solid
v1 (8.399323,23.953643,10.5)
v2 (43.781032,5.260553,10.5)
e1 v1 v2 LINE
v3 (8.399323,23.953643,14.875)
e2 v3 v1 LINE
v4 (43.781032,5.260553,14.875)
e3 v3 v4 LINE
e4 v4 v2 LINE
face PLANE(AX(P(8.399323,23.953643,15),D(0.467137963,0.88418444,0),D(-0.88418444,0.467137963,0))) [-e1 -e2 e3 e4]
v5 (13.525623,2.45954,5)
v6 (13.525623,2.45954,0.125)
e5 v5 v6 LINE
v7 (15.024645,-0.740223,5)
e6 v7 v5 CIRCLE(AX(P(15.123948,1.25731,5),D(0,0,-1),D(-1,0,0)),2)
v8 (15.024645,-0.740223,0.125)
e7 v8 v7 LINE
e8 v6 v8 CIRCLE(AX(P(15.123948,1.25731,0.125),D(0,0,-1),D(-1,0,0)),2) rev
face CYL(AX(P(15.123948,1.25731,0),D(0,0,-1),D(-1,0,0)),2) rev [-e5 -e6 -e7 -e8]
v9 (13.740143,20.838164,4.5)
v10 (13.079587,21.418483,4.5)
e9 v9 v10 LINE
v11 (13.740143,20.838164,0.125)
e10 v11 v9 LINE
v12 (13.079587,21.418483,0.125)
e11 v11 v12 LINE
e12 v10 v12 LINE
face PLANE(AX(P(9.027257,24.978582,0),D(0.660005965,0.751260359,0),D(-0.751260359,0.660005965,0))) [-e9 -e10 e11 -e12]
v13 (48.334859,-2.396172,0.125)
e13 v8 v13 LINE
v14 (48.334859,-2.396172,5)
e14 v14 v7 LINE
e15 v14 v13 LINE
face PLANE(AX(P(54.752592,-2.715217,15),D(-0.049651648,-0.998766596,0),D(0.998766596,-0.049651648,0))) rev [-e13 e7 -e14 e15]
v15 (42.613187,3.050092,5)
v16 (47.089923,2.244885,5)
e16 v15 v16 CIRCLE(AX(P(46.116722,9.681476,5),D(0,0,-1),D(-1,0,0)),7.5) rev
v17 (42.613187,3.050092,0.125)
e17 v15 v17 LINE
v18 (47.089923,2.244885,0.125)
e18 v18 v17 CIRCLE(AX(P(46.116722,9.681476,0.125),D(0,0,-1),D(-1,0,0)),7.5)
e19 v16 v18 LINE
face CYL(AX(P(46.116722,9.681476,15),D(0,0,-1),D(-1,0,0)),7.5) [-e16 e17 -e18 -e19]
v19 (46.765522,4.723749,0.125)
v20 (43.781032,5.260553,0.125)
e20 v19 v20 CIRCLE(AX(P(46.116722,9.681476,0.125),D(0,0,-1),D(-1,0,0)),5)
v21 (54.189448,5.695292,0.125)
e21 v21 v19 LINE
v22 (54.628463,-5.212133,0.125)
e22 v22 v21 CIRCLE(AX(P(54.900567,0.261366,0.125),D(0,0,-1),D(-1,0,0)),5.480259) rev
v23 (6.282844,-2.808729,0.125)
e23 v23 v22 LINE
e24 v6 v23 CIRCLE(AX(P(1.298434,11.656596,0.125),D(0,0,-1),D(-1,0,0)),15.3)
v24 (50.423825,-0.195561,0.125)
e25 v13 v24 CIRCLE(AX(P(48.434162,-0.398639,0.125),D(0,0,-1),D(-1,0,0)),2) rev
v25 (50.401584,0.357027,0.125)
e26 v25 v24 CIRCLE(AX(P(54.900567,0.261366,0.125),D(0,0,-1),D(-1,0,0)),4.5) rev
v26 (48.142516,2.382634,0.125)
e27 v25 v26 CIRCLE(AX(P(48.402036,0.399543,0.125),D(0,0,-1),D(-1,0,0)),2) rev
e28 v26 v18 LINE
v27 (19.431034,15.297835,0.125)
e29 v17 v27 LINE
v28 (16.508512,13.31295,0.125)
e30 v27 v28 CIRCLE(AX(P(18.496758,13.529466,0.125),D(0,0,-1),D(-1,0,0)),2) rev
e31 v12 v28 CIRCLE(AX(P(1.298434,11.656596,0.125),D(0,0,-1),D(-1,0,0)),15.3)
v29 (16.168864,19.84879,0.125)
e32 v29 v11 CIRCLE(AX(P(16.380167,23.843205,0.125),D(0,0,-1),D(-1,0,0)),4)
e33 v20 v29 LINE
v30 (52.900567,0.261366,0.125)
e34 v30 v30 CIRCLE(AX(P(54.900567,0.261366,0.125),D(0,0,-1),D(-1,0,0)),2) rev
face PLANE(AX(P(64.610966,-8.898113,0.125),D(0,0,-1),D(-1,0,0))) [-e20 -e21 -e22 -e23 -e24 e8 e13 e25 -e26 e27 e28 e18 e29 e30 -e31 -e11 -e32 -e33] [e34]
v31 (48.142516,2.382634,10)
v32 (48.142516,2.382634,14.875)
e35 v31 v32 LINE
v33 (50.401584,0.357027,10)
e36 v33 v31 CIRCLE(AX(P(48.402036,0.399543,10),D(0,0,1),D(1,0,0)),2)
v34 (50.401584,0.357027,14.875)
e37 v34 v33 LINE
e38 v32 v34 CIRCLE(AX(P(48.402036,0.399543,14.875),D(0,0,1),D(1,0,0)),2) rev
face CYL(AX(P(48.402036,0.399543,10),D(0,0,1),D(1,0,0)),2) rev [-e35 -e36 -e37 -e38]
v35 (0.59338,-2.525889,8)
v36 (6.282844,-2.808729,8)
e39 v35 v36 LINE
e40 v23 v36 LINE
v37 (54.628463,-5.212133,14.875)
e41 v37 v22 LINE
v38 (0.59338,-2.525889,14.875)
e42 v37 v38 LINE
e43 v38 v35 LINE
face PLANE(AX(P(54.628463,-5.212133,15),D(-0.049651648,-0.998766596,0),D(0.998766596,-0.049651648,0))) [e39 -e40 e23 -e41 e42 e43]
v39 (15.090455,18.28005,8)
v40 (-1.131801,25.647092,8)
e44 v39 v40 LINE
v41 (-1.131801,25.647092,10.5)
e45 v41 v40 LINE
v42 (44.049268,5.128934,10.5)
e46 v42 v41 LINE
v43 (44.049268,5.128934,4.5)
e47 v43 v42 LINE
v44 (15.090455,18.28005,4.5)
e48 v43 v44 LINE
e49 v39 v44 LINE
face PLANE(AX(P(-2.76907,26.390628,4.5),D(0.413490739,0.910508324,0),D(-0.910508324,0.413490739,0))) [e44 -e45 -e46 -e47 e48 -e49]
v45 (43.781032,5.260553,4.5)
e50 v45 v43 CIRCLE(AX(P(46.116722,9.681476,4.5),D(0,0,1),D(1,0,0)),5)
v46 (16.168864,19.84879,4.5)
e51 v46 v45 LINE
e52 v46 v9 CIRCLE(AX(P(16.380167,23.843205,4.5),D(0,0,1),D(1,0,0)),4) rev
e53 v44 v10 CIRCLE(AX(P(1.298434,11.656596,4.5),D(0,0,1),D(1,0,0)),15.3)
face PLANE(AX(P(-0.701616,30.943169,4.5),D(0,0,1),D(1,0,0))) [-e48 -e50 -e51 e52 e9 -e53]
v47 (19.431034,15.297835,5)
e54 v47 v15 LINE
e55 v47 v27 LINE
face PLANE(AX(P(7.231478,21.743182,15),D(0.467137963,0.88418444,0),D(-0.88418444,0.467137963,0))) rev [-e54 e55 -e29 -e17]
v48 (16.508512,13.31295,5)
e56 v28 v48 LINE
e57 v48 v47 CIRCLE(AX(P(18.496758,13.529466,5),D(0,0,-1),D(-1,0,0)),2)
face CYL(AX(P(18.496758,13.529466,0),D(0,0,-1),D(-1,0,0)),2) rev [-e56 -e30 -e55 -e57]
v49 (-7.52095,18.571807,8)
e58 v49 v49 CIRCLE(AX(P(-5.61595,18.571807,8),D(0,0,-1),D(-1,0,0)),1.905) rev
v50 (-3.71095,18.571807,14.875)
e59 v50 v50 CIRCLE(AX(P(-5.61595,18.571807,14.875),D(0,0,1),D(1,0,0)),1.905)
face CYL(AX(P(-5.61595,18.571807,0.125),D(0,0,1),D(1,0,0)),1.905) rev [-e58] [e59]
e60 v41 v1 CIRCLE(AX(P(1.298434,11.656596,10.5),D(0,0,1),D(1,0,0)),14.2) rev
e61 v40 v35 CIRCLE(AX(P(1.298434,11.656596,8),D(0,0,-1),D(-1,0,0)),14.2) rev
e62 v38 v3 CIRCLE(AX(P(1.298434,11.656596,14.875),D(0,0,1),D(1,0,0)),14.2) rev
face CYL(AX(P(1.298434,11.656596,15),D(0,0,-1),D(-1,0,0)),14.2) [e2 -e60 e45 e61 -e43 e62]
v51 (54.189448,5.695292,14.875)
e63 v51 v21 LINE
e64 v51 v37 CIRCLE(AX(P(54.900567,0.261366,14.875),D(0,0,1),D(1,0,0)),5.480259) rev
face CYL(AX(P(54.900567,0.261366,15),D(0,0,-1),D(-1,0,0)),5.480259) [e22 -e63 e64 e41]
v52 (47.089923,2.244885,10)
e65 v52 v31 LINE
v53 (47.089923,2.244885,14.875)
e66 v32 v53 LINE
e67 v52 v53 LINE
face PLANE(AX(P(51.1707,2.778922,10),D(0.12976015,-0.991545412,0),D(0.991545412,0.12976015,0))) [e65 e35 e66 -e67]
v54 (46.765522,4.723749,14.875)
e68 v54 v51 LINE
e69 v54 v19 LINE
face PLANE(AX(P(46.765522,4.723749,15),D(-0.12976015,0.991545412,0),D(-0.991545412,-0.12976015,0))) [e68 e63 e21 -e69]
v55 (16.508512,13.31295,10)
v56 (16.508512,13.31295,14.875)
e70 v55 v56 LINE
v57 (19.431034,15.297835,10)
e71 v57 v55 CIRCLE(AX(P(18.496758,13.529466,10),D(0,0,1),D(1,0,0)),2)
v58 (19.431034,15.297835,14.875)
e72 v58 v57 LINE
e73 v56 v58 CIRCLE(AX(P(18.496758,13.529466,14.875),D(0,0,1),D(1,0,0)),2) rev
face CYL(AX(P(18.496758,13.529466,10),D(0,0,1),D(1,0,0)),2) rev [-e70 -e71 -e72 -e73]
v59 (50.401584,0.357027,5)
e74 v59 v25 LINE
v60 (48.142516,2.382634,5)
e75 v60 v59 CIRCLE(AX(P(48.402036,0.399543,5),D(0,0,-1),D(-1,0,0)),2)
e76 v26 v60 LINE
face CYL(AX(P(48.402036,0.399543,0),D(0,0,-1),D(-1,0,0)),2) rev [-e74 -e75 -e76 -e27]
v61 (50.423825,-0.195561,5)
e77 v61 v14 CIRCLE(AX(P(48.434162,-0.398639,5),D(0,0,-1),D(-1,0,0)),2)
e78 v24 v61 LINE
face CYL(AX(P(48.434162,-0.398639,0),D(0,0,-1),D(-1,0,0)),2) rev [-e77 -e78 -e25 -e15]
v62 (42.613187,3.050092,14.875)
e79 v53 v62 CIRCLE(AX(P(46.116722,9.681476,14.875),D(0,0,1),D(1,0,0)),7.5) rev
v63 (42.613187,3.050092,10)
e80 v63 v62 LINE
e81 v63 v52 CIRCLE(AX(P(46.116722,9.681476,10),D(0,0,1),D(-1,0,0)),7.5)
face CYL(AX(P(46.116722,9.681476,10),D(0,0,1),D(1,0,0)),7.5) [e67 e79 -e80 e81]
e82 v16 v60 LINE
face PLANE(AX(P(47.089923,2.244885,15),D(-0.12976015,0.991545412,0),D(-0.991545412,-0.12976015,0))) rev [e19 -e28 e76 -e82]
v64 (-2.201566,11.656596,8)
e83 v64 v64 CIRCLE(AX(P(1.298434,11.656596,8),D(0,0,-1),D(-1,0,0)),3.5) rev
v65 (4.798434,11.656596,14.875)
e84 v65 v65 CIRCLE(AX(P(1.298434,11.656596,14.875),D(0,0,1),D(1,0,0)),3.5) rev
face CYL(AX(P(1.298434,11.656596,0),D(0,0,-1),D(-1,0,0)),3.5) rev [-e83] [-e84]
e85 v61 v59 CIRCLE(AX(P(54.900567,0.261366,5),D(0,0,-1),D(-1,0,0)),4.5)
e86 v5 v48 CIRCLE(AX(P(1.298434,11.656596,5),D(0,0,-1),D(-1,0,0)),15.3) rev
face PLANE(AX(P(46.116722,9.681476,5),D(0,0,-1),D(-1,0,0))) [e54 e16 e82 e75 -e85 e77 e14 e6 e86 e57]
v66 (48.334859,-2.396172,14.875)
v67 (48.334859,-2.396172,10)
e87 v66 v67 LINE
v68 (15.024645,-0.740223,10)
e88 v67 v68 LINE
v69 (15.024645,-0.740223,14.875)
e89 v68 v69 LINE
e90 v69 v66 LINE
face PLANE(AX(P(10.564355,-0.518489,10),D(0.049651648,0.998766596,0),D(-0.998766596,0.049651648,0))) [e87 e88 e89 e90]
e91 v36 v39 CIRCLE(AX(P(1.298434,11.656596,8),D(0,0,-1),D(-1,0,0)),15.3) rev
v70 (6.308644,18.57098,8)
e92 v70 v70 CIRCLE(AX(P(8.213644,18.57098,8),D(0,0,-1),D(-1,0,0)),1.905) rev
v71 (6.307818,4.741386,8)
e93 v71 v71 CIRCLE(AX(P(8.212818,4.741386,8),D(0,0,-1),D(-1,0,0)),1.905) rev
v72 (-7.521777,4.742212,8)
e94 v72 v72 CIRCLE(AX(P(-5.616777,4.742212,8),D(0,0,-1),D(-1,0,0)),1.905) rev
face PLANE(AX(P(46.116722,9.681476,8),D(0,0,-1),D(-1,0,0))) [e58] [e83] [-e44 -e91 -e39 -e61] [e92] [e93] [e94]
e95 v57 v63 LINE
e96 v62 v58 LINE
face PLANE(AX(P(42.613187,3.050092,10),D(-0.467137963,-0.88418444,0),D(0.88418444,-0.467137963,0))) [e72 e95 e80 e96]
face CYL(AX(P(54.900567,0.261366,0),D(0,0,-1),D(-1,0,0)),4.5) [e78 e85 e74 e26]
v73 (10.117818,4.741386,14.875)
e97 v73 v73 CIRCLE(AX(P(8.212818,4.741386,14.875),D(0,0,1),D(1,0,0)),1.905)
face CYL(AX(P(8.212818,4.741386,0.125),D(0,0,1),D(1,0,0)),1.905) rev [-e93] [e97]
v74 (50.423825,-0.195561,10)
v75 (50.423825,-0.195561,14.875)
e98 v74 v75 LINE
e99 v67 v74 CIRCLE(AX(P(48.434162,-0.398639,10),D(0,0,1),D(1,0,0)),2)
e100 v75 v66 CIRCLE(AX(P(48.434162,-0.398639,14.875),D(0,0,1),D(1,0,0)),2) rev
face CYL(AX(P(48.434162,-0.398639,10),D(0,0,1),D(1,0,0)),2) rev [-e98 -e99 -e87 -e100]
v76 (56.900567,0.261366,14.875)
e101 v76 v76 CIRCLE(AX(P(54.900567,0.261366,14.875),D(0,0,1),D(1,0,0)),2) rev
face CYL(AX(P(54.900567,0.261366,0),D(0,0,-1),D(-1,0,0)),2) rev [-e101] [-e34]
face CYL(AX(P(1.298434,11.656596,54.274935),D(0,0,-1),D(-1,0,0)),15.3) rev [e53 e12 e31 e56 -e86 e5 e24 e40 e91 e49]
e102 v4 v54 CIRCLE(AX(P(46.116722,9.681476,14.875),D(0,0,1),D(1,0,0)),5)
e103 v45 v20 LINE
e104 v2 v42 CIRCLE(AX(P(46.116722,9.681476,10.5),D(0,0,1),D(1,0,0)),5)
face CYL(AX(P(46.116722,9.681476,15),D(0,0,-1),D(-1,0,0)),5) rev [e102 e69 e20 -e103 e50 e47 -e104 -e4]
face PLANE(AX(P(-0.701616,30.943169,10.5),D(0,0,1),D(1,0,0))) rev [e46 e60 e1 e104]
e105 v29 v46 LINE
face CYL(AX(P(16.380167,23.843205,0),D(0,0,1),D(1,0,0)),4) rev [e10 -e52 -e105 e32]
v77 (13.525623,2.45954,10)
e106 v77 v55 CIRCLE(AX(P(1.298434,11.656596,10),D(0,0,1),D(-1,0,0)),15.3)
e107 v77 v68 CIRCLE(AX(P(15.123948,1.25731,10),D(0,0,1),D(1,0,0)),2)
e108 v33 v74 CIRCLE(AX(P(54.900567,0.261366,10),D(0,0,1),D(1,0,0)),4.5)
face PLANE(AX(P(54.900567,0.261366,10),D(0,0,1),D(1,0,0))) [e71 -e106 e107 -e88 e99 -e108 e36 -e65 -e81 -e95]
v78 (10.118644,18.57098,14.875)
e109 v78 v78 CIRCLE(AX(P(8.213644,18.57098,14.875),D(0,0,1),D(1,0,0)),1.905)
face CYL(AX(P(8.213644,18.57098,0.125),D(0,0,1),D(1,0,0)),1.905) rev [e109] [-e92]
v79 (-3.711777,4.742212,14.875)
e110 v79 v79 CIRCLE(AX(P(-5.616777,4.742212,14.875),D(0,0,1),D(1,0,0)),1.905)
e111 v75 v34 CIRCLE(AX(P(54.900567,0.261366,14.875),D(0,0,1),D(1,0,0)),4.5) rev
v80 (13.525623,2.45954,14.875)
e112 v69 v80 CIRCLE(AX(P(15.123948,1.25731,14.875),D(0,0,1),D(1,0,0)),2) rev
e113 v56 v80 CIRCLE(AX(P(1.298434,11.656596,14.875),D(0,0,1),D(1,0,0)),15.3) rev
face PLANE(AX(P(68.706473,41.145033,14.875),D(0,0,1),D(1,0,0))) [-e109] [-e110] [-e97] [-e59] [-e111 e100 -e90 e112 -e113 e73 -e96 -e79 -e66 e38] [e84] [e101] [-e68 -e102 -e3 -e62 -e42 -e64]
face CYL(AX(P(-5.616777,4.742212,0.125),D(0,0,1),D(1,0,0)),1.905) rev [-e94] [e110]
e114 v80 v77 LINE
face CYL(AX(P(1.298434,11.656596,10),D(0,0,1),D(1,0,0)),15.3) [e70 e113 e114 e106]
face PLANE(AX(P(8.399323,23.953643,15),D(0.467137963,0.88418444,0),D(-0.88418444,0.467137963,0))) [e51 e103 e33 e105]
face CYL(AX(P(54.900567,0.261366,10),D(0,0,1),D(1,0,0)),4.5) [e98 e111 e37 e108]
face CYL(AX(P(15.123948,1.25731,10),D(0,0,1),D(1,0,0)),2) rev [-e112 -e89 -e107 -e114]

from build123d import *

# Parameters (mm, degrees)
BOSS_EXTRUDE1_DEPTH                     = 15
F_4_0_4_DIAMETER_HOLE1_D                = 4
CBORE_FOR_M6_HEX_HEAD_BOLT1_D           = 7
CBORE_FOR_M6_HEX_HEAD_BOLT1_CBORE_D     = 25.6
CBORE_FOR_M6_HEX_HEAD_BOLT1_CBORE_DEPTH = 3
SHELL1_DEPTH                            = 5
CUT_EXTRUDE4_START                      = 5
CUT_EXTRUDE4_DEPTH                      = 5
CUT_EXTRUDE5_DEPTH                      = 3
CUT_EXTRUDE5_DEPTH_BACK                 = 3
SKETCH23_R                              = 5
CUT_EXTRUDE6_DEPTH                      = 67.110950493
CUT_EXTRUDE6_DEPTH_BACK                 = 3
FILLET1_R                               = 2
SKETCH30_W                              = 87.8922038
SKETCH30_H                              = 63.386693804
CUT_EXTRUDE8_DEPTH                      = 0.125
SKETCH31_W                              = 82.344977649
SKETCH31_H                              = 39.024548637
CUT_EXTRUDE9_DEPTH                      = 0.125
SKETCH38_R                              = 1.905
CUT_EXTRUDE10_DEPTH                     = 68.319909946
SKETCH39_R                              = 15.3
CUT_EXTRUDE11_DEPTH                     = 7.875


# Read off the part's stored shape, not the designer's step: Shell1
with BuildPart() as part:
    # Sketch1 → Boss-Extrude1 (new body)
    with BuildSketch(Plane(origin=(0, 0, 0), x_dir=(-1, 0, 0), z_dir=(0, 0, -1))):
        with BuildLine():
            Line((-54.628463331, -5.212133486), (-0.593380164, -2.525889334))
            ThreePointArc((-0.593380164, -2.525889334), (12.32206912, 15.671805741), (-8.399323253, 23.953643362))
            Line((-8.399323253, 23.953643362), (-43.781031906, 5.260553383))
            ThreePointArc((-43.781031906, 5.260553383), (-45.231601083, 4.760443022), (-46.765522471, 4.723748524))
            Line((-46.765522471, 4.723748524), (-54.189447973, 5.695292216))
            ThreePointArc((-54.189447973, 5.695292216), (-60.376392814, 0.481764046), (-54.628463331, -5.212133486))
        make_face()
    extrude(amount=-BOSS_EXTRUDE1_DEPTH)

    # Ø4.0 (4) Diameter Hole1 (through all)
    with Locations(Plane(origin=(0, 0, 0), x_dir=(-1, 0, 0), z_dir=(0, 0, -1))):
        with Locations((-54.900567232, 0.261366347)):
            Hole(F_4_0_4_DIAMETER_HOLE1_D / 2)

    # CBORE for M6 Hex Head Bolt1 (through all)
    with Locations(Plane(origin=(0, 0, 0), x_dir=(-1, 0, 0), z_dir=(0, 0, -1))):
        with Locations((-1.298433566, 11.656596333)):
            CounterBoreHole(CBORE_FOR_M6_HEX_HEAD_BOLT1_D / 2, CBORE_FOR_M6_HEX_HEAD_BOLT1_CBORE_D / 2, CBORE_FOR_M6_HEX_HEAD_BOLT1_CBORE_DEPTH)

    # Shell1 outline → Shell1 (cut)
    with BuildSketch(Plane.XY):
        with BuildLine():
            Line((51.170699652, 2.778922273), (47.089922847, 2.244884995))
            ThreePointArc((47.089922847, 2.244884995), (44.789040765, 2.299926742), (42.613186999, 3.050092283))
            Line((42.613186999, 3.050092283), (15.48696558, 17.381590594))
            ThreePointArc((15.48696558, 17.381590594), (16.050757412, 7.599634274), (10.564355185, -0.518488741))
            Line((10.564355185, -0.518488741), (51.385096413, -2.547808785))
            ThreePointArc((51.385096413, -2.547808785), (50.404207808, 0.080391395), (51.170699652, 2.778922273))
        make_face()
    extrude(amount=SHELL1_DEPTH, mode=Mode.SUBTRACT)

    # Sketch21 → Cut-Extrude4 (cut)
    with BuildSketch(Plane(origin=(0, 0, 15), x_dir=(-1, 0, 0), z_dir=(0, 0, -1)).offset(CUT_EXTRUDE4_START)):
        with BuildLine():
            Line((-51.170699652, 2.778922273), (-47.089922847, 2.244884995))
            ThreePointArc((-47.089922847, 2.244884995), (-44.789040765, 2.299926742), (-42.613186999, 3.050092283))
            Line((-42.613186999, 3.050092283), (-15.48696558, 17.381590594))
            ThreePointArc((-15.48696558, 17.381590594), (-16.050757412, 7.599634274), (-10.564355185, -0.518488741))
            Line((-10.564355185, -0.518488741), (-51.385096413, -2.547808785))
            ThreePointArc((-51.385096413, -2.547808785), (-50.404207808, 0.080391395), (-51.170699652, 2.778922273))
        make_face()
    extrude(amount=-CUT_EXTRUDE4_DEPTH, mode=Mode.SUBTRACT)

    # Sketch23 → Cut-Extrude5 (cut, two sides: drawn at the far end of the back side and taken through both)
    with BuildSketch(Plane(origin=(0, 0, 7.5), x_dir=(-1, 0, 0), z_dir=(0, 0, -1)).offset(-CUT_EXTRUDE5_DEPTH_BACK)):
        with Locations((-65.267572651, 7.904637809)):
            Circle(SKETCH23_R)
        Polygon((2.769070011, 26.390627774), (-44.049268023, 5.128933961), (-46.116721719, 9.681475582), (0.701616314, 30.943169395), align=None)
    extrude(amount=CUT_EXTRUDE5_DEPTH + CUT_EXTRUDE5_DEPTH_BACK, mode=Mode.SUBTRACT)

    # Sketch24 → Cut-Extrude6 (cut, two sides: drawn at the far end of the back side and taken through both)
    with BuildSketch(Plane(origin=(0, 0, 7.5), x_dir=(-1, 0, 0), z_dir=(0, 0, -1)).offset(-CUT_EXTRUDE6_DEPTH_BACK)):
        with BuildLine():
            Line((-9.027257312, 24.978582277), (-13.74014268, 20.838163554))
            ThreePointArc((-13.74014268, 20.838163554), (-20.357630392, 23.419198741), (-14.432959892, 27.337255112))
            Line((-14.432959892, 27.337255112), (-9.027257312, 24.978582277))
        make_face()
    extrude(amount=CUT_EXTRUDE6_DEPTH + CUT_EXTRUDE6_DEPTH_BACK, mode=Mode.SUBTRACT)

    # Fillet1
    fillet1_edges = [part.edges().sort_by_distance(p)[0] for p in [
        (10.564355185, -0.518488741, 2.5),
        (51.170699652, 2.778922273, 2.5),
        (51.385096413, -2.547808785, 2.5),
        (15.48696558, 17.381590594, 2.5),
        (51.170699652, 2.778922273, 12.5),
        (51.385096413, -2.547808785, 12.5),
        (10.564355185, -0.518488741, 12.5),
        (15.48696558, 17.381590594, 12.5),
    ]]
    fillet(fillet1_edges, radius=FILLET1_R)

    # Sketch30 → Cut-Extrude8 (cut)
    with BuildSketch(Plane.XY.offset(15)):
        with Locations((24.760370948, 9.451685766)):
            Rectangle(SKETCH30_W, SKETCH30_H)
    extrude(amount=-CUT_EXTRUDE8_DEPTH, mode=Mode.SUBTRACT)

    # Sketch31 → Cut-Extrude9 (cut)
    with BuildSketch(Plane(origin=(0, 0, 0), x_dir=(-1, 0, 0), z_dir=(0, 0, -1))):
        with Locations((-23.438477607, 10.614160855)):
            Rectangle(SKETCH31_W, SKETCH31_H)
    extrude(amount=-CUT_EXTRUDE9_DEPTH, mode=Mode.SUBTRACT)

    # Sketch38 → Cut-Extrude10 (cut, through all)
    with BuildSketch(Plane.XY.offset(14.875)):
        with Locations((-5.615950455, 18.571806714)):
            Circle(SKETCH38_R)
        with Locations((8.213643947, 18.570980353)):
            Circle(SKETCH38_R)
        with Locations((8.212817586, 4.741385951)):
            Circle(SKETCH38_R)
        with Locations((-5.616776816, 4.742212313)):
            Circle(SKETCH38_R)
    extrude(amount=-CUT_EXTRUDE10_DEPTH, mode=Mode.SUBTRACT)

    # Sketch39 → Cut-Extrude11 (cut)
    with BuildSketch(Plane(origin=(0, 0, 0.125), x_dir=(-1, 0, 0), z_dir=(0, 0, -1))):
        with Locations((-1.298433566, 11.656596333)):
            Circle(SKETCH39_R)
    extrude(amount=-CUT_EXTRUDE11_DEPTH, mode=Mode.SUBTRACT)


solid = part.part
